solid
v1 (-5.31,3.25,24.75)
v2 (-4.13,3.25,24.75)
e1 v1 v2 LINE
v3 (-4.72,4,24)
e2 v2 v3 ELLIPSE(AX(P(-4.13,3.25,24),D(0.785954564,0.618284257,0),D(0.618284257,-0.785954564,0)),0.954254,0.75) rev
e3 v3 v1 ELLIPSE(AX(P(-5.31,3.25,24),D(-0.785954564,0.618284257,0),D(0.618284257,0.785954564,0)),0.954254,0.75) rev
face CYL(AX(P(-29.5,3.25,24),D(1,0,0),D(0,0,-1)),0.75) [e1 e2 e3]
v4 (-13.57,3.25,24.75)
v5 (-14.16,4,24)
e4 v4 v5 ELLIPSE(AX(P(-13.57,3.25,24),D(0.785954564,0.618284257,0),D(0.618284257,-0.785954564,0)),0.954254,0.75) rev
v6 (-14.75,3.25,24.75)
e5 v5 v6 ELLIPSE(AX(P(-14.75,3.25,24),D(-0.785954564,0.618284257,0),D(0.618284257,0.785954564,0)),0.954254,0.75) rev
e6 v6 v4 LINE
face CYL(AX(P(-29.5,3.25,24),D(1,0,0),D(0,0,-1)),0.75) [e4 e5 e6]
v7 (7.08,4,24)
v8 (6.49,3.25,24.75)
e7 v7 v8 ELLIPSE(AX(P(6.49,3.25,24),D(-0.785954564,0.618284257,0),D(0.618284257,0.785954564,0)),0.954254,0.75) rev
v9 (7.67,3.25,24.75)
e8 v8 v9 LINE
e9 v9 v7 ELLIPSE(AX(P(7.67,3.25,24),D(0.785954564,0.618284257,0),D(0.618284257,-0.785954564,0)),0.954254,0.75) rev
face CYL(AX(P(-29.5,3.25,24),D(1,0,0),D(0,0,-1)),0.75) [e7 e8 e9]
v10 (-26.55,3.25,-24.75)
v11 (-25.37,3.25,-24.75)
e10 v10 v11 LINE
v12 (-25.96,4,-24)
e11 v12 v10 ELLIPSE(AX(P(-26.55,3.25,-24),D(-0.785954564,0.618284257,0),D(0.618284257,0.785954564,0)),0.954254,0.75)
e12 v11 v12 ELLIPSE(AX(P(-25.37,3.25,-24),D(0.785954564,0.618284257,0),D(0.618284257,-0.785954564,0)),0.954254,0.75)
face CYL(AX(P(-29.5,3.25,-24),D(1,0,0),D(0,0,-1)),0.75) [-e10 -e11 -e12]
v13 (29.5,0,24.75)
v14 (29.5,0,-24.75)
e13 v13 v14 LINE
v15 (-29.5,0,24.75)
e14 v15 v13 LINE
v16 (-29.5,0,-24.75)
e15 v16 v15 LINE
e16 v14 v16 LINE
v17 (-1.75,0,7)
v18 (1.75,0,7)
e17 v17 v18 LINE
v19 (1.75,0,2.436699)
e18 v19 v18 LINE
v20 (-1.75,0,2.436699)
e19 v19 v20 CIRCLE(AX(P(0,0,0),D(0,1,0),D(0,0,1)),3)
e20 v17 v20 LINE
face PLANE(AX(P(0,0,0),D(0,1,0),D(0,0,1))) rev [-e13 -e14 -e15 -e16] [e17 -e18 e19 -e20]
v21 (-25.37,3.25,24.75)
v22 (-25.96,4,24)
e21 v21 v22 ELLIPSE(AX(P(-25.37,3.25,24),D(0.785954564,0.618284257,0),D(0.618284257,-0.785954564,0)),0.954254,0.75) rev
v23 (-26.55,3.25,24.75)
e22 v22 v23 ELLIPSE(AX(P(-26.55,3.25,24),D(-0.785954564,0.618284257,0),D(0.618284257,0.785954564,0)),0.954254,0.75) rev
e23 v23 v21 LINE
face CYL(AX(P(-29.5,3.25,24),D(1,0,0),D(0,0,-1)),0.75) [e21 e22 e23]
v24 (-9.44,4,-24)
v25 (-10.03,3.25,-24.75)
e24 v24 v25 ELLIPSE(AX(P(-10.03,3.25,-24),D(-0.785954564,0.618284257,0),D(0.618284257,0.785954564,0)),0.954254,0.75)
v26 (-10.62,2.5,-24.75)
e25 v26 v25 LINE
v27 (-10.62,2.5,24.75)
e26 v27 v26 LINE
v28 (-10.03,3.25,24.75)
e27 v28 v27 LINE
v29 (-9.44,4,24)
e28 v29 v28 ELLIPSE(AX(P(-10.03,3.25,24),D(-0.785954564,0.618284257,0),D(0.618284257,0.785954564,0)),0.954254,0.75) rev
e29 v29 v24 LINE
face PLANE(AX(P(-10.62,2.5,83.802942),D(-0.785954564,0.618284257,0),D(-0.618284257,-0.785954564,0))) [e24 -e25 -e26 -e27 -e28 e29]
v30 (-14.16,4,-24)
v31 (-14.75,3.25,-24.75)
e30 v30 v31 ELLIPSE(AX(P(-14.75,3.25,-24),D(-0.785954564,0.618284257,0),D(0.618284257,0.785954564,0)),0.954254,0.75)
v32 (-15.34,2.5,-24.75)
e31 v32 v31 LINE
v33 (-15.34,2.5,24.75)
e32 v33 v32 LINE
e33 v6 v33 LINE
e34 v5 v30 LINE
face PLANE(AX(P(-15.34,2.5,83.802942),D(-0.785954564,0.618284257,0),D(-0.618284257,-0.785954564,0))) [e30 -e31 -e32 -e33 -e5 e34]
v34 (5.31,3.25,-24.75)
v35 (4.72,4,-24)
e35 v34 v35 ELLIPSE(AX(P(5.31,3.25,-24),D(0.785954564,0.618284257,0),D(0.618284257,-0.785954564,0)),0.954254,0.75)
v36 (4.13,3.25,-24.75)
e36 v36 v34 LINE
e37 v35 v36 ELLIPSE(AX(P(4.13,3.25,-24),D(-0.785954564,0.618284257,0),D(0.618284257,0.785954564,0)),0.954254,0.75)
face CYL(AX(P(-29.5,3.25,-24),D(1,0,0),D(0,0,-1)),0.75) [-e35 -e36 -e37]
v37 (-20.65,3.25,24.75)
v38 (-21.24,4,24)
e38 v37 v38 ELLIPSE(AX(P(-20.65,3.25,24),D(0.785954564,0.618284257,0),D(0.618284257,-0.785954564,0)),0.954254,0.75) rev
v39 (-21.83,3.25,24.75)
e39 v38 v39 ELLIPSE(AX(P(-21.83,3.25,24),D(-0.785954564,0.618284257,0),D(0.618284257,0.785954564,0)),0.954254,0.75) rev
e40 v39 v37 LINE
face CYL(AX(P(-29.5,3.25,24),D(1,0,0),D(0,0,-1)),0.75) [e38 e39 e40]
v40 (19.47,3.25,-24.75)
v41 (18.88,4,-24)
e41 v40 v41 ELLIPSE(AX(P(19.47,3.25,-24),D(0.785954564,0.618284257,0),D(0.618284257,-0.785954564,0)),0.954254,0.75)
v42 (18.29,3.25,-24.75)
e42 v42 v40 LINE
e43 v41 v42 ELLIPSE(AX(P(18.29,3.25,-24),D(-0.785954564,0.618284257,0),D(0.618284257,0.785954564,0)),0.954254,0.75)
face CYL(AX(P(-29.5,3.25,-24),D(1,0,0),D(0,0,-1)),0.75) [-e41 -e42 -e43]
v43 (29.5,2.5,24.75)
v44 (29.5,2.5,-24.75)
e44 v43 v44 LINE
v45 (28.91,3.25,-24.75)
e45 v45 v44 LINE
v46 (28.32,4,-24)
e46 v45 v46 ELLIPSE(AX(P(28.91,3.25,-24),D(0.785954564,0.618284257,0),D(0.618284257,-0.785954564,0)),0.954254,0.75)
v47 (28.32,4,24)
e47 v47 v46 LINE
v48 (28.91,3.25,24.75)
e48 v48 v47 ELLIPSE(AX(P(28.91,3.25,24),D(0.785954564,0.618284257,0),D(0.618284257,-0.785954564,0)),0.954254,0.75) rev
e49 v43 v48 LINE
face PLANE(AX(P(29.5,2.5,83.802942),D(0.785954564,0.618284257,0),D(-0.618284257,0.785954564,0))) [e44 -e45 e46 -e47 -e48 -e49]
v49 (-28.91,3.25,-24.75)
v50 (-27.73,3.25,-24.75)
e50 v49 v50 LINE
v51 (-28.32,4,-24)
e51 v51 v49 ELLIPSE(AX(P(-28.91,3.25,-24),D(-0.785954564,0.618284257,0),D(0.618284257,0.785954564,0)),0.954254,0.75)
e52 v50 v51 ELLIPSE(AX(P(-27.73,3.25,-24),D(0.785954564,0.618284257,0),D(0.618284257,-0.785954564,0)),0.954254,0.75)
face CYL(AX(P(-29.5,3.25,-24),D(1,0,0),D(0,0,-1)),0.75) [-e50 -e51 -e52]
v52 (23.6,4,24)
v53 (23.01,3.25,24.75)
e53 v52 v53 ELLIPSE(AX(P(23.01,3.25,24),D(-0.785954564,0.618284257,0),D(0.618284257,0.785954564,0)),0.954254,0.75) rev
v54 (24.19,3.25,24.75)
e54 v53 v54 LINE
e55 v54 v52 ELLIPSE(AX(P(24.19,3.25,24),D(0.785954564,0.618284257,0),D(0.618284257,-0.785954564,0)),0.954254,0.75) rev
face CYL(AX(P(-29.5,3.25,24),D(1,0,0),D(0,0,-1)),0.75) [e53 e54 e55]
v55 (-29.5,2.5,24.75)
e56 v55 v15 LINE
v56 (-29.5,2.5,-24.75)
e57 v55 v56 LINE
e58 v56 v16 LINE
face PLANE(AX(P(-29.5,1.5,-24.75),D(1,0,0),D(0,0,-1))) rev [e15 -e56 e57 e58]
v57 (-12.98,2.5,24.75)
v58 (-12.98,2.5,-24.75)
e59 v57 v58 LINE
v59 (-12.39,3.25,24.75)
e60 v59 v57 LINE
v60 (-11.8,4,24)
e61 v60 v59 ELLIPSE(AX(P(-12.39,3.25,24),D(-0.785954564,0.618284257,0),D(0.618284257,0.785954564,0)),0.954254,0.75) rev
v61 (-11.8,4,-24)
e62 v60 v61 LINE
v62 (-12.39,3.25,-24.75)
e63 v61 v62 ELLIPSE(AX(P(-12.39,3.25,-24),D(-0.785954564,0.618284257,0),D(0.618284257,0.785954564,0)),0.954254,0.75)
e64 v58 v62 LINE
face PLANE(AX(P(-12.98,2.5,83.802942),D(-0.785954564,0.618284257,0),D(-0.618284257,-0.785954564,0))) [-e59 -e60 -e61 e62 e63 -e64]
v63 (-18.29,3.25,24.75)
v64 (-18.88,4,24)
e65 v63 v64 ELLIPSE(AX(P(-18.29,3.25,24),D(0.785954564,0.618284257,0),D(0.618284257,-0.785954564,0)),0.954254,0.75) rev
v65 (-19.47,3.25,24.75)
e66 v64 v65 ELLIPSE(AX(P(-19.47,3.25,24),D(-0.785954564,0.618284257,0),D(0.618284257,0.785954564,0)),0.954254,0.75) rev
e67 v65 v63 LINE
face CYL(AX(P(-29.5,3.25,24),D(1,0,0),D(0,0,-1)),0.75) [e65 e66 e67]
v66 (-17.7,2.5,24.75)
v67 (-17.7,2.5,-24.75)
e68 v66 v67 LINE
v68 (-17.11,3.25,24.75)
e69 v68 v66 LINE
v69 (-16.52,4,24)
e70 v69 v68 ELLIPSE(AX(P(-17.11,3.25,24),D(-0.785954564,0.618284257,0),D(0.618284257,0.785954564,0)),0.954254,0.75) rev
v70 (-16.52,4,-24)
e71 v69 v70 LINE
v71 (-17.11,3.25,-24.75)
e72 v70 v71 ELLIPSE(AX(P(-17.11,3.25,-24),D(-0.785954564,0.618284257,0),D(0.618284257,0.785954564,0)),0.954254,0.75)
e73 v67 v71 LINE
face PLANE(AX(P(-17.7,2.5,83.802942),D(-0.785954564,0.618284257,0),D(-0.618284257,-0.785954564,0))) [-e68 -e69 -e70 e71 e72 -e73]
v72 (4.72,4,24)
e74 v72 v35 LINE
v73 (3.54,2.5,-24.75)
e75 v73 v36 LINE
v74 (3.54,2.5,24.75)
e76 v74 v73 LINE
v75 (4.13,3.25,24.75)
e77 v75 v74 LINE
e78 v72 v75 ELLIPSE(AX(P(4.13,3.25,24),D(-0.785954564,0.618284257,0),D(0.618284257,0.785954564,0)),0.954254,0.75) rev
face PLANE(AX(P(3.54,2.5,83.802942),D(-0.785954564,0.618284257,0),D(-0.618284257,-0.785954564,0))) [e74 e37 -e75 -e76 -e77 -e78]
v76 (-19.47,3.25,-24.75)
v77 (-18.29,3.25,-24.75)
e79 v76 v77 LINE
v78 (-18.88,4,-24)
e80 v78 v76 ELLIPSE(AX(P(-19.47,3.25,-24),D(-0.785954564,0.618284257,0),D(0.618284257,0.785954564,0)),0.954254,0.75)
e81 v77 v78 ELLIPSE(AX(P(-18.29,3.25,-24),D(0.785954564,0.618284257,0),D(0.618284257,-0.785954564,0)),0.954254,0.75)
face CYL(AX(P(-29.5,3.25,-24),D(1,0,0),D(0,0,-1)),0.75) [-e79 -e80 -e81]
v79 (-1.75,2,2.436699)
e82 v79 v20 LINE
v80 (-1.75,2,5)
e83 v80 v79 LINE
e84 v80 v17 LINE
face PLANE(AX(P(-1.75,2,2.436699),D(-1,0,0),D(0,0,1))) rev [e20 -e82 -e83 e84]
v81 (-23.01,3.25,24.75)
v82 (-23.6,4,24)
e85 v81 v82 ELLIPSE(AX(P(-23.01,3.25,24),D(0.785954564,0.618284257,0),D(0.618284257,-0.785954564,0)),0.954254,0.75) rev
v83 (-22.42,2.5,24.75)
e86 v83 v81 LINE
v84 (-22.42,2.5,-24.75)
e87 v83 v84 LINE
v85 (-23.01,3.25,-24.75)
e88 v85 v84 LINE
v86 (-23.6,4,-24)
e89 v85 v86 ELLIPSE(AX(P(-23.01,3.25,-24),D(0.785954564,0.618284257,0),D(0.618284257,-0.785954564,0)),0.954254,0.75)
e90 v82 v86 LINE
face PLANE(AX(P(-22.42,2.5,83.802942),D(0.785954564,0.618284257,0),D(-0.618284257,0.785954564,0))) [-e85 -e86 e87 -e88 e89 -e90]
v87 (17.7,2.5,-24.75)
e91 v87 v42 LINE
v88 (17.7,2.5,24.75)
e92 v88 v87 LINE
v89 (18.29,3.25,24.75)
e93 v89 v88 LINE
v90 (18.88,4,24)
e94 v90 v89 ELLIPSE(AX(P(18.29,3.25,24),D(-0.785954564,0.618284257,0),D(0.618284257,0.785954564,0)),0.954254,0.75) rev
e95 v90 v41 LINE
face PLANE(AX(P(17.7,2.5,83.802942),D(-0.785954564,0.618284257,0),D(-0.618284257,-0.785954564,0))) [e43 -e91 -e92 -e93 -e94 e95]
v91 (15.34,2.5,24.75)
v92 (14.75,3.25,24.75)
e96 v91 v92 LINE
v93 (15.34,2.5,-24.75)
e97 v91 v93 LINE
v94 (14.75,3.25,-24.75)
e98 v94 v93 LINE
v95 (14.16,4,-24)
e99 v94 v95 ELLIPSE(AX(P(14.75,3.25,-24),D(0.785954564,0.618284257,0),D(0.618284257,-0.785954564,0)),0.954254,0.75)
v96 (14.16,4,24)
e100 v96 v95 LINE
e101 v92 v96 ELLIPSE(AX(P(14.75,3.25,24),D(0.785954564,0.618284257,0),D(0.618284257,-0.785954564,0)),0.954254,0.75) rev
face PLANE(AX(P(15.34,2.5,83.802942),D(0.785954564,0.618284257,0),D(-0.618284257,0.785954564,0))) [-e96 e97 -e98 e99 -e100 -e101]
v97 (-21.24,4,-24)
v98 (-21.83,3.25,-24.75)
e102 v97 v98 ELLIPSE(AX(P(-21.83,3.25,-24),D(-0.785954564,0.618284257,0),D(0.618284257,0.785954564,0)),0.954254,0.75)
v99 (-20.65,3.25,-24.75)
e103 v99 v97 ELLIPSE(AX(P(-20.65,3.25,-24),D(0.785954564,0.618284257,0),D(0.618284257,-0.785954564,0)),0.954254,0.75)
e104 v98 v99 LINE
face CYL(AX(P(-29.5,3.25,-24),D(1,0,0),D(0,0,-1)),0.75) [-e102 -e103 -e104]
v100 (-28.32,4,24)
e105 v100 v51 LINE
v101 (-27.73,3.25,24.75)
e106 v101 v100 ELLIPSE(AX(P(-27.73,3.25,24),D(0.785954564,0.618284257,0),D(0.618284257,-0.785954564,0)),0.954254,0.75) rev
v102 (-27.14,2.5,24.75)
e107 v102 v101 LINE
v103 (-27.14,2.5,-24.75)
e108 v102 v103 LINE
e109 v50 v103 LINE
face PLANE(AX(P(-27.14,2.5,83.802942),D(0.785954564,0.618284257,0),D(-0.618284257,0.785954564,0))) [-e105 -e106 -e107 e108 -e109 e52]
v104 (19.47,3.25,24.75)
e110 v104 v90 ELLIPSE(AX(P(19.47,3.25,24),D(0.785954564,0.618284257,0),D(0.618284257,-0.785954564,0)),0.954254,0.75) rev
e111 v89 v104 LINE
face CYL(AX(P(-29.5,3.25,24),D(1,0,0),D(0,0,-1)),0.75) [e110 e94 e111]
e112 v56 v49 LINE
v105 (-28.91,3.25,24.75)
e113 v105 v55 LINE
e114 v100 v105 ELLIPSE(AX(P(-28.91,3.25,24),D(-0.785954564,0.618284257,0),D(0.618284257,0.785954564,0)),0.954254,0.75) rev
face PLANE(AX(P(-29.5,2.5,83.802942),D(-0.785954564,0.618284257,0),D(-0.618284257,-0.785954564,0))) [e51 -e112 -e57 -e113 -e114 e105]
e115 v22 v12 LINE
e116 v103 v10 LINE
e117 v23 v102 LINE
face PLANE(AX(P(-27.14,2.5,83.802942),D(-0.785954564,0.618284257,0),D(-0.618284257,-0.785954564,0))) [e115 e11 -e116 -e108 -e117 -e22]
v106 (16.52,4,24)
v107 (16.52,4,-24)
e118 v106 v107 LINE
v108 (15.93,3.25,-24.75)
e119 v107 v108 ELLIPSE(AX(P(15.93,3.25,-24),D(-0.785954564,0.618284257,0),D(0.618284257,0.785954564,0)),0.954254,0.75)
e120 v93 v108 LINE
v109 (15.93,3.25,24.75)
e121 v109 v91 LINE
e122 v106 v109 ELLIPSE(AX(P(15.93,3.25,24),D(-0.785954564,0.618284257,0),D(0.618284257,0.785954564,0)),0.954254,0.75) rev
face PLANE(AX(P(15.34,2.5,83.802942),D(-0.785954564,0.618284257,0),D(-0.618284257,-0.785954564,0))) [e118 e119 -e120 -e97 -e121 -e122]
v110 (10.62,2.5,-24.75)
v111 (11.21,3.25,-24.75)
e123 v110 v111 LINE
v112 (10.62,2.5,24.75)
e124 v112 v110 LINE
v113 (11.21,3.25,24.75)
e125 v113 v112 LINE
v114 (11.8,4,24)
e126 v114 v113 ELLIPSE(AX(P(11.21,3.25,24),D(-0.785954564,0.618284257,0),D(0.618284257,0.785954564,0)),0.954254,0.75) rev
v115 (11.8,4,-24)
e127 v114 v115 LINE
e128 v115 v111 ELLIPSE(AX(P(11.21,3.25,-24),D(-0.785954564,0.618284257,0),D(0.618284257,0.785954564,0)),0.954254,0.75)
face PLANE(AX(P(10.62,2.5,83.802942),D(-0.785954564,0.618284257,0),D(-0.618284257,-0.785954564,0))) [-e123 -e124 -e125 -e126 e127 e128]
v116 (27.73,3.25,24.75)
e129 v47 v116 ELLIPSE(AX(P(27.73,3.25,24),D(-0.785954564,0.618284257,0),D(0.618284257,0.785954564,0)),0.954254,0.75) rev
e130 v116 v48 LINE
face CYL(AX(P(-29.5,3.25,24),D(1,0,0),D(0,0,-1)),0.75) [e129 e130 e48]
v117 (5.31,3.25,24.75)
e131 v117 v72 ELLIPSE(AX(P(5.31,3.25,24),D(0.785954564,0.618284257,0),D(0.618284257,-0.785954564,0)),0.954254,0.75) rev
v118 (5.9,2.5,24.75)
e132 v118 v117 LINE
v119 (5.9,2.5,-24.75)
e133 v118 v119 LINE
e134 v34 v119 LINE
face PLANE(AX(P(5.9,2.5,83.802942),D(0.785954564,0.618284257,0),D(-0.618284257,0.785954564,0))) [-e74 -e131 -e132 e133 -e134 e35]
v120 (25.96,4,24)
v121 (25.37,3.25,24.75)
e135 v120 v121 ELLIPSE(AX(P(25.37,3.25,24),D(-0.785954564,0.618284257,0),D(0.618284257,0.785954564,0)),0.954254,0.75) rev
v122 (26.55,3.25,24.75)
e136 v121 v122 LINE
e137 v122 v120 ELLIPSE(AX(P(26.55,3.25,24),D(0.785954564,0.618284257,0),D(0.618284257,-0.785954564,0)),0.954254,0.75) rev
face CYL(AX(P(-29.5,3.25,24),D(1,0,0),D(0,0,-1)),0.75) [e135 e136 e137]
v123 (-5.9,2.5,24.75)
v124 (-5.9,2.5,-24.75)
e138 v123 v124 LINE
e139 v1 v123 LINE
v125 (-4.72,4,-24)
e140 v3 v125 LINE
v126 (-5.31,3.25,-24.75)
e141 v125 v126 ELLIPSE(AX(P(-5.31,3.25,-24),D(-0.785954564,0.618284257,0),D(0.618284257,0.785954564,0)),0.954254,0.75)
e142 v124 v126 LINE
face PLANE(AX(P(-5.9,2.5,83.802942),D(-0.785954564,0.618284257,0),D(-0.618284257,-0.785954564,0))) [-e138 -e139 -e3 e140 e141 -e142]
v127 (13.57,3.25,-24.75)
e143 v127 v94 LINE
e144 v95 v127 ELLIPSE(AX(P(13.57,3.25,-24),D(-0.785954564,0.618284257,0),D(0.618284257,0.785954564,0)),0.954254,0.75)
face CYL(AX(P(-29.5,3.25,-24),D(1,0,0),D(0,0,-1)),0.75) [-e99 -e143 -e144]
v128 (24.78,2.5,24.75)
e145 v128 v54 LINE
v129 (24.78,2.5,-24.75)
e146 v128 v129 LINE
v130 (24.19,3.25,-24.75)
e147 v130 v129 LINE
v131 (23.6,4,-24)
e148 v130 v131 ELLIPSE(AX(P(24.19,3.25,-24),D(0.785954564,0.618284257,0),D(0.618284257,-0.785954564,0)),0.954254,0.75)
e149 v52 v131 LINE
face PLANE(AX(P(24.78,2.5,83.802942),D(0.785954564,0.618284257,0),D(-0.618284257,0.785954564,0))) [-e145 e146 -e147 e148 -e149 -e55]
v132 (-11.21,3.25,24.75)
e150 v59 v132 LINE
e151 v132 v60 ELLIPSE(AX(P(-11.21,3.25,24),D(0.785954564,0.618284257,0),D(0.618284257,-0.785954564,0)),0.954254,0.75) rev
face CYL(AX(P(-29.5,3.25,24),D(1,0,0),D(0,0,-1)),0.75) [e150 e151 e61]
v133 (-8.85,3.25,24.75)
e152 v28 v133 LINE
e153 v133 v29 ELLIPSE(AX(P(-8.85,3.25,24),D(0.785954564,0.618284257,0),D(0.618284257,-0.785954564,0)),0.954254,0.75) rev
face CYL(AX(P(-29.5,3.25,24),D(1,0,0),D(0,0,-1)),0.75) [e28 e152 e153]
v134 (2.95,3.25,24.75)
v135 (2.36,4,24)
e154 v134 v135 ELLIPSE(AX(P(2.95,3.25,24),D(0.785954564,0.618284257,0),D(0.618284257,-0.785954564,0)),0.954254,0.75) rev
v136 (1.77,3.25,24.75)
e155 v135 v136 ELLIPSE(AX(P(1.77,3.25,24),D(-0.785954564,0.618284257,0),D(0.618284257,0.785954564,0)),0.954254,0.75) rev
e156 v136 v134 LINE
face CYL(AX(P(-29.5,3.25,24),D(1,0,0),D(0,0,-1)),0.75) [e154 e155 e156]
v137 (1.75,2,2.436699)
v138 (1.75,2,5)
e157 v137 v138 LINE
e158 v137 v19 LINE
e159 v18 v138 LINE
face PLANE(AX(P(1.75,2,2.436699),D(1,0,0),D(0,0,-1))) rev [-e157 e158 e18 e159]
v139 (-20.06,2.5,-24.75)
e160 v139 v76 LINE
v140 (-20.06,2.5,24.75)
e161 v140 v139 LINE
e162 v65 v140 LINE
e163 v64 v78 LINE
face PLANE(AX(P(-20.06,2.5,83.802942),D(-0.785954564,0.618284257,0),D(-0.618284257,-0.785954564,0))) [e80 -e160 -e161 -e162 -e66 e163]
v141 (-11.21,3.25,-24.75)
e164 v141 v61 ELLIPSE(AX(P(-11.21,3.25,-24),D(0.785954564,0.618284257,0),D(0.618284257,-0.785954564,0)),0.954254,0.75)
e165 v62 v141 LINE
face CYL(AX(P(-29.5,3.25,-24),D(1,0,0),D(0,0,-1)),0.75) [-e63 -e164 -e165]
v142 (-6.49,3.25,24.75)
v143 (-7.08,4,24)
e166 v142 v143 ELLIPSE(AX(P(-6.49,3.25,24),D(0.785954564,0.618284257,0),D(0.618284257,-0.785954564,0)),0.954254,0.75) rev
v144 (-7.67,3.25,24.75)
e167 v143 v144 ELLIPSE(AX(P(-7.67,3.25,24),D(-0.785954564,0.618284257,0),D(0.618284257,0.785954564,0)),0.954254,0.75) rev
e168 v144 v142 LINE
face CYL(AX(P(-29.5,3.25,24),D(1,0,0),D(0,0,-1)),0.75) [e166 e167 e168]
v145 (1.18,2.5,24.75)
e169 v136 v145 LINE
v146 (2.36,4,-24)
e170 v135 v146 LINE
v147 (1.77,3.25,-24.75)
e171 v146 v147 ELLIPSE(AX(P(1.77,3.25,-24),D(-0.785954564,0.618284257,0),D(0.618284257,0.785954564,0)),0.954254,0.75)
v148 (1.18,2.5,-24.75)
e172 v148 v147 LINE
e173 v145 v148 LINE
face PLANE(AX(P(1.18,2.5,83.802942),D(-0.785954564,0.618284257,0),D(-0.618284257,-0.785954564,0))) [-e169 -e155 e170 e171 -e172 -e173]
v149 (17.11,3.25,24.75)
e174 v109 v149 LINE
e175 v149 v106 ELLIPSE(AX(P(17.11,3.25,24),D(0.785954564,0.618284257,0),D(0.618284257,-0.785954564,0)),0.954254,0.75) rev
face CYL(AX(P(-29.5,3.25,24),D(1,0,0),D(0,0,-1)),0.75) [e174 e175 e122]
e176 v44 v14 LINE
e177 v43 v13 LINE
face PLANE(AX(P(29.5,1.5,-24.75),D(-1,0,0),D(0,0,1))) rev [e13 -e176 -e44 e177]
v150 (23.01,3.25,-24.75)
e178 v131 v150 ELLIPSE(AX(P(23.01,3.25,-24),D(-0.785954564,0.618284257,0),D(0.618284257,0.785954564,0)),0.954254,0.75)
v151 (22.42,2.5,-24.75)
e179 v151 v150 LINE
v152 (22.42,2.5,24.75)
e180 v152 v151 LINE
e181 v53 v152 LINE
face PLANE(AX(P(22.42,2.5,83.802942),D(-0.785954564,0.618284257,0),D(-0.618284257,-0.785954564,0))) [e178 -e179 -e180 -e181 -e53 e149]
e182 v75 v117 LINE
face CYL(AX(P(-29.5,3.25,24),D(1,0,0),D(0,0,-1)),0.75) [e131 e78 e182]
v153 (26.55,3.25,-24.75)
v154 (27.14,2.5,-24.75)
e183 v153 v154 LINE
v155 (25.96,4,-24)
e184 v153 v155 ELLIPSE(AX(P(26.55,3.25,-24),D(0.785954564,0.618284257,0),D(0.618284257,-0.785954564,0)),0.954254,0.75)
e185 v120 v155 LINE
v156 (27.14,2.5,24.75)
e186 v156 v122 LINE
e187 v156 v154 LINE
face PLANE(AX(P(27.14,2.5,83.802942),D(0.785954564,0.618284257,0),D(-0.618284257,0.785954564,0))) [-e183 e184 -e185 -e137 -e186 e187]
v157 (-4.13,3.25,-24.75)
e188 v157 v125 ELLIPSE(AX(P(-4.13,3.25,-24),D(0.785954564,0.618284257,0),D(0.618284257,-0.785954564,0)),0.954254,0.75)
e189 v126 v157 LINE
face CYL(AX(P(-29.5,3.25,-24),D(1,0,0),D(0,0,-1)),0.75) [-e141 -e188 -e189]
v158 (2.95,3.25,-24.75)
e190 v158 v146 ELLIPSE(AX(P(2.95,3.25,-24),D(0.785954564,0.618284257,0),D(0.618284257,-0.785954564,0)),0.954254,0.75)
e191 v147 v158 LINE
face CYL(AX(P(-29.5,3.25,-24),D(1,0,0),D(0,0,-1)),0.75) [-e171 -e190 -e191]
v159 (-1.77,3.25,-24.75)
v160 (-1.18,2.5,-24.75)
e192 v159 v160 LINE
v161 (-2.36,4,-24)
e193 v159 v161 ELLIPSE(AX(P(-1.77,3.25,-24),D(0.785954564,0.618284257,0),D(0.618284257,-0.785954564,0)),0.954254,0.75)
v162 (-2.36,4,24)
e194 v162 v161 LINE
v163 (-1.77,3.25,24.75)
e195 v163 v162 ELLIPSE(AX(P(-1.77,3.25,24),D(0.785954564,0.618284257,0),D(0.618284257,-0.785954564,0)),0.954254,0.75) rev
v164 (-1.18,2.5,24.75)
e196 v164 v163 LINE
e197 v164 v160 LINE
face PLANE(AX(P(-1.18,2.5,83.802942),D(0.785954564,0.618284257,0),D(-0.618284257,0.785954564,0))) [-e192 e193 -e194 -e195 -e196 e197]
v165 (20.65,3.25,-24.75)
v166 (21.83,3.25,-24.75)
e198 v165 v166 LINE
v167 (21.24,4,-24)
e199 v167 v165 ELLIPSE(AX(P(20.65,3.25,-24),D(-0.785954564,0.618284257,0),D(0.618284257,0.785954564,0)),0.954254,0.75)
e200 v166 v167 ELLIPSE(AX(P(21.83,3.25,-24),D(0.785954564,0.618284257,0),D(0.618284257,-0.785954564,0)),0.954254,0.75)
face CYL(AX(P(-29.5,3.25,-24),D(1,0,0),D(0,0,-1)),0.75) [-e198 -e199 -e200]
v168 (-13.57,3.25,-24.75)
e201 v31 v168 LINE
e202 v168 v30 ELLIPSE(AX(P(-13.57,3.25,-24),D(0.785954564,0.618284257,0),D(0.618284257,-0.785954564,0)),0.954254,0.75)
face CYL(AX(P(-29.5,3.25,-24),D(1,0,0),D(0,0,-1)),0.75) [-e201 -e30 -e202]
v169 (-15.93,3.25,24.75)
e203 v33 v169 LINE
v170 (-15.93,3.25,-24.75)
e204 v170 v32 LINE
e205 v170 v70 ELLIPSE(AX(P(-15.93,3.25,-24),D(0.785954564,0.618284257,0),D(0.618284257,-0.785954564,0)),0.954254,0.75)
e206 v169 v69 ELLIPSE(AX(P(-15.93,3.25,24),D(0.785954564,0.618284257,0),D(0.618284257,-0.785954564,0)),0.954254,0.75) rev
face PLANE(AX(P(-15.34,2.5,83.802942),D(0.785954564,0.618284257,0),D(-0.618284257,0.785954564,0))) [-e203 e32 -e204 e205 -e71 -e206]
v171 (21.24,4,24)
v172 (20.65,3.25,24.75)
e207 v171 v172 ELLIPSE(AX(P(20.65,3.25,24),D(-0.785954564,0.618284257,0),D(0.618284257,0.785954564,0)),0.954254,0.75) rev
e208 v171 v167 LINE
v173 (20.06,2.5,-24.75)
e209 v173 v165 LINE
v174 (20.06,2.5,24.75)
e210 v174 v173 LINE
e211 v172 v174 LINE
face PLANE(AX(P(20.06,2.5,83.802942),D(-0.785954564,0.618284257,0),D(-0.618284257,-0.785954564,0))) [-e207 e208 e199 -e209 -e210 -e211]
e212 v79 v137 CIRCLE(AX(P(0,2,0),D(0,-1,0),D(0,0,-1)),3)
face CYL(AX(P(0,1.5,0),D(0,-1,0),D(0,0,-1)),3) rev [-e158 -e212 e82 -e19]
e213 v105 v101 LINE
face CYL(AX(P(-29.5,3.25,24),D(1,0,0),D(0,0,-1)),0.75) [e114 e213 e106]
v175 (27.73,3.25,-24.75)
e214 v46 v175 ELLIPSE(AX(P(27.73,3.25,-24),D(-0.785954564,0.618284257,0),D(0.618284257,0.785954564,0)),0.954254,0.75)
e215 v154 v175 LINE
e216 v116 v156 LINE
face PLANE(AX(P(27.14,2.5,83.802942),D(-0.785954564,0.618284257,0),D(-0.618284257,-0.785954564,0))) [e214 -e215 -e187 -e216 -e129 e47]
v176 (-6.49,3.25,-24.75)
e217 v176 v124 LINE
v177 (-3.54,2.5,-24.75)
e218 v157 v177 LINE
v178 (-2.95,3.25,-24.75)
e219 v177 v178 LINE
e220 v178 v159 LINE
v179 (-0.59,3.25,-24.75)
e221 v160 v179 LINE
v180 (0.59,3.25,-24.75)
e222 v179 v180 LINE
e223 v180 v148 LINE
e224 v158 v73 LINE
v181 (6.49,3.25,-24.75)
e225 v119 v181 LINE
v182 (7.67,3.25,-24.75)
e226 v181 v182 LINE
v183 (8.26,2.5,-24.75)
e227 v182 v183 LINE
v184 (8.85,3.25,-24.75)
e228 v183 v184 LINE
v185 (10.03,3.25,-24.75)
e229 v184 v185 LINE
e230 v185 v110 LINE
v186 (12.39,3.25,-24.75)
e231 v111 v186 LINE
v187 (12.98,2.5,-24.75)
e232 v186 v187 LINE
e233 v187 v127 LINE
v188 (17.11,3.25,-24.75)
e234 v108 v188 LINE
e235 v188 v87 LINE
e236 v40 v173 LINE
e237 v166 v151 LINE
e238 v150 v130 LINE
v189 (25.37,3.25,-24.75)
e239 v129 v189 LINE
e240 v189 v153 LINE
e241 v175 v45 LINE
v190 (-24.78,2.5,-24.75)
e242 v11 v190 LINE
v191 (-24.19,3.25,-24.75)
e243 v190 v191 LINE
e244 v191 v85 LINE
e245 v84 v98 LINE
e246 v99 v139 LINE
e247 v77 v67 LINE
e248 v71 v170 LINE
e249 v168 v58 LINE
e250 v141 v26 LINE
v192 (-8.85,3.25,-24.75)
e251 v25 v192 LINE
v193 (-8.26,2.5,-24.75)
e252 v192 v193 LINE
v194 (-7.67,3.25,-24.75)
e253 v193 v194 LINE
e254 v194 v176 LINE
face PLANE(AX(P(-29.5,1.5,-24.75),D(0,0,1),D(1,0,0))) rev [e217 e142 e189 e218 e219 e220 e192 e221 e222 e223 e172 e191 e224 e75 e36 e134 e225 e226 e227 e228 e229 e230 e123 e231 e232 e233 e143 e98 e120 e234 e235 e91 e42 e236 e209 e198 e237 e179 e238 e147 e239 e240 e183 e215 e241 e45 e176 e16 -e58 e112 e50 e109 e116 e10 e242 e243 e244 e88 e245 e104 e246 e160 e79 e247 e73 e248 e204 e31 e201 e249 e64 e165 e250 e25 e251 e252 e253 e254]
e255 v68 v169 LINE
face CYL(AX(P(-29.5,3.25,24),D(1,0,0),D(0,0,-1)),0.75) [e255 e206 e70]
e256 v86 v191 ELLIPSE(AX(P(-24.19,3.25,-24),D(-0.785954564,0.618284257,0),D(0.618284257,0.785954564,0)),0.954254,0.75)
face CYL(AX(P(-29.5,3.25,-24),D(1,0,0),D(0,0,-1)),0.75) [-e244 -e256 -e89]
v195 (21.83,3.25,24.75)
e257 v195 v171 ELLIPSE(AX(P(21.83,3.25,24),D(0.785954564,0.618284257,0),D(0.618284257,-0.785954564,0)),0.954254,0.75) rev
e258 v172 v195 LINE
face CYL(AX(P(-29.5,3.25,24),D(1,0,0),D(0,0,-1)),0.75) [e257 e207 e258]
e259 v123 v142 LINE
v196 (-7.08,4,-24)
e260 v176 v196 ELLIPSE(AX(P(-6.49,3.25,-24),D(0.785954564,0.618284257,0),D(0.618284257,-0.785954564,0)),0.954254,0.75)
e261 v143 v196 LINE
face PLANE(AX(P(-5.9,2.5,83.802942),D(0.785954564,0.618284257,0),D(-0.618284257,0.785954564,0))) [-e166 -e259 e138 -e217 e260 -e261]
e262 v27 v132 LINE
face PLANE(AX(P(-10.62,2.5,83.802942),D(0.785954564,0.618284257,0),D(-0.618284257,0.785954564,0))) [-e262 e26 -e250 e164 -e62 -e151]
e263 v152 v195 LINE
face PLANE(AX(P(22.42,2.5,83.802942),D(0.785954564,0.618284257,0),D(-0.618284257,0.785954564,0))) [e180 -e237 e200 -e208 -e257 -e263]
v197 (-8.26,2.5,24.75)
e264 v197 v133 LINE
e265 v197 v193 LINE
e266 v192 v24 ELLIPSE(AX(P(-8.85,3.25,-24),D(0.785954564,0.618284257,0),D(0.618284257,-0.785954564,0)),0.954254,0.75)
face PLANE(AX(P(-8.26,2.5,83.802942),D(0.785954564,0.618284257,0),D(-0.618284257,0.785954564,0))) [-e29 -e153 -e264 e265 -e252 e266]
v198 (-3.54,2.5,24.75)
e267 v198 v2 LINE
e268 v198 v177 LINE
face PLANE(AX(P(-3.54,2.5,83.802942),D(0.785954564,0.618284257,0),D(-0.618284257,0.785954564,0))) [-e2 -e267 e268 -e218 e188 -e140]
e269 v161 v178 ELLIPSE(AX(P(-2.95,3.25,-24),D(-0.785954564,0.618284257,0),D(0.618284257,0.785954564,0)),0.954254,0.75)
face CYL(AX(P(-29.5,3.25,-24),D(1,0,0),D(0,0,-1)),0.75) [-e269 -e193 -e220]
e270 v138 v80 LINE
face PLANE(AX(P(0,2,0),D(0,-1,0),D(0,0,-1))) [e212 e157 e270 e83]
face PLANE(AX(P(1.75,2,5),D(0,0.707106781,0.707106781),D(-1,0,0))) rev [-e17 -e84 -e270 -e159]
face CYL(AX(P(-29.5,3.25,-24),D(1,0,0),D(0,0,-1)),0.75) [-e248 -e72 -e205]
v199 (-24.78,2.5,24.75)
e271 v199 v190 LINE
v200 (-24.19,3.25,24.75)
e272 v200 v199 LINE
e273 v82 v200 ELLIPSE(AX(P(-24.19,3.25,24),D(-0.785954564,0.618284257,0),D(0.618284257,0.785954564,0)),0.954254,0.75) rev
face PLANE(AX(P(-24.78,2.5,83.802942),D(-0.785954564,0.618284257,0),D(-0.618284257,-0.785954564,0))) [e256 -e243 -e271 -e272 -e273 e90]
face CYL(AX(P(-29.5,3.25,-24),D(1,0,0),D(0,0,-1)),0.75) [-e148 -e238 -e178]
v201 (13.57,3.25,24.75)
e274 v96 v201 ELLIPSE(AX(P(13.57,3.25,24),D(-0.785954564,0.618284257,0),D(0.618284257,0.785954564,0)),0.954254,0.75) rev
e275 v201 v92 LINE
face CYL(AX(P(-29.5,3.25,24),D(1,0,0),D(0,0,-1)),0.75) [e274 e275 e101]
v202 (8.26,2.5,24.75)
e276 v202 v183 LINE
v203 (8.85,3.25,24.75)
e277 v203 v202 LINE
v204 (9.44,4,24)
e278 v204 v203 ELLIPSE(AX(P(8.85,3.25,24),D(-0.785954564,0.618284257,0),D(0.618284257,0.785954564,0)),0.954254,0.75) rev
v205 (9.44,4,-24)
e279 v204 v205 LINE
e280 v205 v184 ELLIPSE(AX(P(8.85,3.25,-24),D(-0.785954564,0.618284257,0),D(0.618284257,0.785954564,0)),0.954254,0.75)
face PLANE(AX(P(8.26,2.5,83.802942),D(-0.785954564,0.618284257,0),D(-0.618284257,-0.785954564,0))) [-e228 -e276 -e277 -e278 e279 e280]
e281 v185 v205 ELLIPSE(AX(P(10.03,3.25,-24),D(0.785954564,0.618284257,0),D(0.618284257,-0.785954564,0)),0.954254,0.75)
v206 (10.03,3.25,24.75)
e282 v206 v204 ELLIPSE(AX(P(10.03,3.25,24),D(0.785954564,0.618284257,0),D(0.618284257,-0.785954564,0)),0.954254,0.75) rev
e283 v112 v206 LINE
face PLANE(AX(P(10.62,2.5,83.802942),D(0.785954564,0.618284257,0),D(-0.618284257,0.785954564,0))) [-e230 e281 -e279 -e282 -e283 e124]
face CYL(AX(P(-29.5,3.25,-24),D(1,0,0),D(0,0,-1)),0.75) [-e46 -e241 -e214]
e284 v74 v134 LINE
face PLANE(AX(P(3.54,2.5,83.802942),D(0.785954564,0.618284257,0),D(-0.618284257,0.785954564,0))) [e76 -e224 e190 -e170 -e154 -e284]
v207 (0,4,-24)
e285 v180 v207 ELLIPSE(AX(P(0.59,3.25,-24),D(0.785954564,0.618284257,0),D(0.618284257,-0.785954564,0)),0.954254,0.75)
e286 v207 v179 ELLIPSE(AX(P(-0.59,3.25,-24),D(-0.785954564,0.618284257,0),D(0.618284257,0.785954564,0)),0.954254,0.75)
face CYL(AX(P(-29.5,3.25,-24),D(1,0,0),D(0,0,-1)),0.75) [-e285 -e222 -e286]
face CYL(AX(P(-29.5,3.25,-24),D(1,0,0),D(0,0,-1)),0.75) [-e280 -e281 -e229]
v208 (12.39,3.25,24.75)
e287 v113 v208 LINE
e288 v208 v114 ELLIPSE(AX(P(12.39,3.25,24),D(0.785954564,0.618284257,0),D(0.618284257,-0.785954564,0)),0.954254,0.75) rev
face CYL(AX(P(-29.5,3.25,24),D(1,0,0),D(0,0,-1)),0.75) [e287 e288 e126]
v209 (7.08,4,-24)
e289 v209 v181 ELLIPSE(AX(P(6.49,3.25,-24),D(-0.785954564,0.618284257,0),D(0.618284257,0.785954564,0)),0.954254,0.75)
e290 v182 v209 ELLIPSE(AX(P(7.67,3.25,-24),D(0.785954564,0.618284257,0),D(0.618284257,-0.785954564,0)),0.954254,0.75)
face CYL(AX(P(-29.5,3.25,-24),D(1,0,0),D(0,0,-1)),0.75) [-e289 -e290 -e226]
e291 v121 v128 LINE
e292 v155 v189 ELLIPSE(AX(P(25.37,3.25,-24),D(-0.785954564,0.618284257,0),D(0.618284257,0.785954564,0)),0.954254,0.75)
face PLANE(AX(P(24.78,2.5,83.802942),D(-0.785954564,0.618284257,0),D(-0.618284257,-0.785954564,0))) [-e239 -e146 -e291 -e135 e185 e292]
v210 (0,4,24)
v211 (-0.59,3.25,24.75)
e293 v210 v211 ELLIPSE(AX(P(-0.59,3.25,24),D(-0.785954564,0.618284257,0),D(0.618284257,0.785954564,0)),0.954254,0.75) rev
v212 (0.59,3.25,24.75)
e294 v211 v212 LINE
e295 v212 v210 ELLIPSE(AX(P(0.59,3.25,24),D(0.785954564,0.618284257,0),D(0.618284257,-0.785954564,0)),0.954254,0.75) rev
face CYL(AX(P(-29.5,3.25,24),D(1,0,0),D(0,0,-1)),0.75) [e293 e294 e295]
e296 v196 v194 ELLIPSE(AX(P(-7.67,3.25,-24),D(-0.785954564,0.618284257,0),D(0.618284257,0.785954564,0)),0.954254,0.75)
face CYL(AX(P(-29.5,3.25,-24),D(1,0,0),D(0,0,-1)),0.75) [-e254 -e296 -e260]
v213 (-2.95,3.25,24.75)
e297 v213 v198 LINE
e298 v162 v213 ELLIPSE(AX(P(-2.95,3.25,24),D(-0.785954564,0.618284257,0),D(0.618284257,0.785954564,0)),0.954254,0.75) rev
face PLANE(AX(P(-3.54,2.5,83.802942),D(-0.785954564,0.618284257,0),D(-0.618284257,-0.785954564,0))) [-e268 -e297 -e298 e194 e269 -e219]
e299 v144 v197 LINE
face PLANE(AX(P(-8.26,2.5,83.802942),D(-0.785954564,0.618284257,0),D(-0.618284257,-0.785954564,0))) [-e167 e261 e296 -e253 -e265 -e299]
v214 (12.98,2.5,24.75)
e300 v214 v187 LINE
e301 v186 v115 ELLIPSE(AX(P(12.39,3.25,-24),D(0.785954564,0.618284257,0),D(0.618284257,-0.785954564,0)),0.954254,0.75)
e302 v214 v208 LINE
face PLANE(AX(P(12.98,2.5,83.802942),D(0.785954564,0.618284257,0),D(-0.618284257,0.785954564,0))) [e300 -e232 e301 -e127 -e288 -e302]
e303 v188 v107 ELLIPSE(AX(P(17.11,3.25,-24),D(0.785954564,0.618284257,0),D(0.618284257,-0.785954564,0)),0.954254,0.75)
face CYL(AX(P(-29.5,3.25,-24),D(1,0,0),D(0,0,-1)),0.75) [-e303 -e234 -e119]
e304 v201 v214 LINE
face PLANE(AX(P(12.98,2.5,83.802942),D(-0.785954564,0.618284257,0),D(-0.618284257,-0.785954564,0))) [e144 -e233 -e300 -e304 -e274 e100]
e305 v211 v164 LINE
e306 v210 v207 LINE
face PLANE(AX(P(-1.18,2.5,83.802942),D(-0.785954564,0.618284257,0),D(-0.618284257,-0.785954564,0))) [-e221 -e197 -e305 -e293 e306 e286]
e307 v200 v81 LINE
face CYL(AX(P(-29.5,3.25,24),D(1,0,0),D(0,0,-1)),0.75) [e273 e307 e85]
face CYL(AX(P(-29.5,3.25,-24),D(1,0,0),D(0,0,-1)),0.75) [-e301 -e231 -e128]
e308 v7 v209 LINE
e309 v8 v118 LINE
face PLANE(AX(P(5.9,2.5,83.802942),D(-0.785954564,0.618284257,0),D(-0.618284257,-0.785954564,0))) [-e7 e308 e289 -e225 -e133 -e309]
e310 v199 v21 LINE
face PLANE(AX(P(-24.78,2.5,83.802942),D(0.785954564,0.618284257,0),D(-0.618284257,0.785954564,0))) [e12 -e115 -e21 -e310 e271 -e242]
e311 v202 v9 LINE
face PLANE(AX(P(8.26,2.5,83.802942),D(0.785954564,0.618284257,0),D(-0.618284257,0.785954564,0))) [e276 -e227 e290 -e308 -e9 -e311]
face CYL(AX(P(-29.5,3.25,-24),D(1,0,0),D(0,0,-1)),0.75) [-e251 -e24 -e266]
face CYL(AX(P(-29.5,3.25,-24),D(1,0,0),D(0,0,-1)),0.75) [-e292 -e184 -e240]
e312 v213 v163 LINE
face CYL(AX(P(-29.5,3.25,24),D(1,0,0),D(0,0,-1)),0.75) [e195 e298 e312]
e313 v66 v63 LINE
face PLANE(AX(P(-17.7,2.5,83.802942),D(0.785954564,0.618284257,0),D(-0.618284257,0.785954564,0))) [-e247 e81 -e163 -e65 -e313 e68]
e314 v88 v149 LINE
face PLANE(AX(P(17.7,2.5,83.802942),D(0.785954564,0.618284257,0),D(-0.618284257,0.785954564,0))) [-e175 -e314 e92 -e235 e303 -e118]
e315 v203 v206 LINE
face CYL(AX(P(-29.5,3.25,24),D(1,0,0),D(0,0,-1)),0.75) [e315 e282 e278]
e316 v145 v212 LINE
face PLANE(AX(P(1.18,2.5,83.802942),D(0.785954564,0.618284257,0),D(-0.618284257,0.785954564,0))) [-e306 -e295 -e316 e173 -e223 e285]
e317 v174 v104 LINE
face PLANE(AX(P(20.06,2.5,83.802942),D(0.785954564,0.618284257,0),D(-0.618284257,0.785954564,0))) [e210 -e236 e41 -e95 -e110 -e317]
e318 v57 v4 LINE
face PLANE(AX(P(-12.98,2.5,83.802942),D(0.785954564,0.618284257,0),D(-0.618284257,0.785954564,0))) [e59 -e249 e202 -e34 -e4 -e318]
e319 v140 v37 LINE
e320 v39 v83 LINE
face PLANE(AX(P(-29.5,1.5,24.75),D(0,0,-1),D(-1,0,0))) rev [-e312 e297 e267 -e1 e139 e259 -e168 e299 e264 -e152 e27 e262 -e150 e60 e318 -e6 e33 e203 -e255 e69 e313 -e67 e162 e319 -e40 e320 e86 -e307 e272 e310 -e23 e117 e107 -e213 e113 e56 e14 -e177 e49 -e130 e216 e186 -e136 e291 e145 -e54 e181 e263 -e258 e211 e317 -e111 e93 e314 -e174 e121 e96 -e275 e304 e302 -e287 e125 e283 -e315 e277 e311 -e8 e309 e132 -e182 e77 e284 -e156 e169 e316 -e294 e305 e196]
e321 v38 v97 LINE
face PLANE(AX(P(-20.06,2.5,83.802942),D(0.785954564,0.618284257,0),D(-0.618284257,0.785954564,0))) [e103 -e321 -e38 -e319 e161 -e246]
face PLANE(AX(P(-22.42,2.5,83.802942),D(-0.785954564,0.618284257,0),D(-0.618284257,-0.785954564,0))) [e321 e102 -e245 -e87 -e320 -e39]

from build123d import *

# Parameters (mm, degrees)
SKETCH1_W           = 59
SKETCH1_H           = 49.5
SKETCH1_R           = 3
BOSS_EXTRUDE1_DEPTH = 1.5
BOSS_EXTRUDE2_DEPTH = 49.5
CUT_EXTRUDE1_DEPTH  = 2
CUT_EXTRUDE3_DEPTH  = 65.105869466
CHAMFER3_SIZE       = 2


with BuildPart() as part:
    # Sketch1 → Boss-Extrude1 (new body)
    with BuildSketch(Plane(origin=(0, 0, 0), x_dir=(1, 0, 0), z_dir=(0, 1, 0))):
        Rectangle(SKETCH1_W, SKETCH1_H)
        with Locations(Location((0, 0, 0), (0, 0, 270))):
            Circle(SKETCH1_R, mode=Mode.SUBTRACT)
    extrude(amount=BOSS_EXTRUDE1_DEPTH)

    # Sketch2 → Boss-Extrude2 (add)
    with BuildSketch(Plane(origin=(0, 0, -24.75), x_dir=(-1, 0, 0), z_dir=(0, 0, -1))):
        Polygon((-29.5, 1.5), (29.5, 1.5), (29.5, 2.5), (28.32, 4), (27.14, 2.5), (25.96, 4), (24.78, 2.5), (23.6, 4), (22.42, 2.5), (21.24, 4), (20.06, 2.5), (18.88, 4), (17.7, 2.5), (16.52, 4), (15.34, 2.5), (14.16, 4), (12.98, 2.5), (11.8, 4), (10.62, 2.5), (9.44, 4), (8.26, 2.5), (7.08, 4), (5.9, 2.5), (4.72, 4), (3.54, 2.5), (2.36, 4), (1.18, 2.5), (0, 4), (-1.18, 2.5), (-2.36, 4), (-3.54, 2.5), (-4.72, 4), (-5.9, 2.5), (-7.08, 4), (-8.26, 2.5), (-9.44, 4), (-10.62, 2.5), (-11.8, 4), (-12.98, 2.5), (-14.16, 4), (-15.34, 2.5), (-16.52, 4), (-17.7, 2.5), (-18.88, 4), (-20.06, 2.5), (-21.24, 4), (-22.42, 2.5), (-23.6, 4), (-24.78, 2.5), (-25.96, 4), (-27.14, 2.5), (-28.32, 4), (-29.5, 2.5), align=None)
    extrude(amount=-BOSS_EXTRUDE2_DEPTH)

    # Sketch3 → Cut-Extrude1 (cut)
    with BuildSketch(Plane(origin=(0, 0, 0), x_dir=(-1, 0, 0), z_dir=(0, -1, 0))):
        with BuildLine():
            Line((-1.75, -2.436698586), (-1.75, -5))
            Line((-1.75, -5), (1.75, -5))
            Line((1.75, -5), (1.75, -2.436698586))
            ThreePointArc((1.75, -2.436698586), (0, 3), (-1.75, -2.436698586))
        make_face()
    extrude(amount=-CUT_EXTRUDE1_DEPTH, mode=Mode.SUBTRACT)

    # Sketch4 → Cut-Extrude3 (cut, through all)
    with BuildSketch(Plane(origin=(29.5, 0, 0), x_dir=(0, 0, -1), z_dir=(1, 0, 0))):
        with BuildLine():
            Line((-24, 4), (-24.75, 4))
            Line((-24.75, 4), (-24.75, 3.25))
            ThreePointArc((-24.75, 3.25), (-24.530330086, 3.780330086), (-24, 4))
        make_face()
    cut_extrude3 = extrude(amount=-CUT_EXTRUDE3_DEPTH, mode=Mode.SUBTRACT)

    # Mirror1: Cut-Extrude3 across plane
    add(cut_extrude3.mirror(Plane.XY), mode=Mode.SUBTRACT)

    # Chamfer3
    chamfer3_edges = [part.edges().sort_by_distance(p)[0] for p in [
        (0, 0, 5),
    ]]
    chamfer(chamfer3_edges, length=CHAMFER3_SIZE - 0.0001)  # a hair under: the kernel refuses the full size


solid = part.part
